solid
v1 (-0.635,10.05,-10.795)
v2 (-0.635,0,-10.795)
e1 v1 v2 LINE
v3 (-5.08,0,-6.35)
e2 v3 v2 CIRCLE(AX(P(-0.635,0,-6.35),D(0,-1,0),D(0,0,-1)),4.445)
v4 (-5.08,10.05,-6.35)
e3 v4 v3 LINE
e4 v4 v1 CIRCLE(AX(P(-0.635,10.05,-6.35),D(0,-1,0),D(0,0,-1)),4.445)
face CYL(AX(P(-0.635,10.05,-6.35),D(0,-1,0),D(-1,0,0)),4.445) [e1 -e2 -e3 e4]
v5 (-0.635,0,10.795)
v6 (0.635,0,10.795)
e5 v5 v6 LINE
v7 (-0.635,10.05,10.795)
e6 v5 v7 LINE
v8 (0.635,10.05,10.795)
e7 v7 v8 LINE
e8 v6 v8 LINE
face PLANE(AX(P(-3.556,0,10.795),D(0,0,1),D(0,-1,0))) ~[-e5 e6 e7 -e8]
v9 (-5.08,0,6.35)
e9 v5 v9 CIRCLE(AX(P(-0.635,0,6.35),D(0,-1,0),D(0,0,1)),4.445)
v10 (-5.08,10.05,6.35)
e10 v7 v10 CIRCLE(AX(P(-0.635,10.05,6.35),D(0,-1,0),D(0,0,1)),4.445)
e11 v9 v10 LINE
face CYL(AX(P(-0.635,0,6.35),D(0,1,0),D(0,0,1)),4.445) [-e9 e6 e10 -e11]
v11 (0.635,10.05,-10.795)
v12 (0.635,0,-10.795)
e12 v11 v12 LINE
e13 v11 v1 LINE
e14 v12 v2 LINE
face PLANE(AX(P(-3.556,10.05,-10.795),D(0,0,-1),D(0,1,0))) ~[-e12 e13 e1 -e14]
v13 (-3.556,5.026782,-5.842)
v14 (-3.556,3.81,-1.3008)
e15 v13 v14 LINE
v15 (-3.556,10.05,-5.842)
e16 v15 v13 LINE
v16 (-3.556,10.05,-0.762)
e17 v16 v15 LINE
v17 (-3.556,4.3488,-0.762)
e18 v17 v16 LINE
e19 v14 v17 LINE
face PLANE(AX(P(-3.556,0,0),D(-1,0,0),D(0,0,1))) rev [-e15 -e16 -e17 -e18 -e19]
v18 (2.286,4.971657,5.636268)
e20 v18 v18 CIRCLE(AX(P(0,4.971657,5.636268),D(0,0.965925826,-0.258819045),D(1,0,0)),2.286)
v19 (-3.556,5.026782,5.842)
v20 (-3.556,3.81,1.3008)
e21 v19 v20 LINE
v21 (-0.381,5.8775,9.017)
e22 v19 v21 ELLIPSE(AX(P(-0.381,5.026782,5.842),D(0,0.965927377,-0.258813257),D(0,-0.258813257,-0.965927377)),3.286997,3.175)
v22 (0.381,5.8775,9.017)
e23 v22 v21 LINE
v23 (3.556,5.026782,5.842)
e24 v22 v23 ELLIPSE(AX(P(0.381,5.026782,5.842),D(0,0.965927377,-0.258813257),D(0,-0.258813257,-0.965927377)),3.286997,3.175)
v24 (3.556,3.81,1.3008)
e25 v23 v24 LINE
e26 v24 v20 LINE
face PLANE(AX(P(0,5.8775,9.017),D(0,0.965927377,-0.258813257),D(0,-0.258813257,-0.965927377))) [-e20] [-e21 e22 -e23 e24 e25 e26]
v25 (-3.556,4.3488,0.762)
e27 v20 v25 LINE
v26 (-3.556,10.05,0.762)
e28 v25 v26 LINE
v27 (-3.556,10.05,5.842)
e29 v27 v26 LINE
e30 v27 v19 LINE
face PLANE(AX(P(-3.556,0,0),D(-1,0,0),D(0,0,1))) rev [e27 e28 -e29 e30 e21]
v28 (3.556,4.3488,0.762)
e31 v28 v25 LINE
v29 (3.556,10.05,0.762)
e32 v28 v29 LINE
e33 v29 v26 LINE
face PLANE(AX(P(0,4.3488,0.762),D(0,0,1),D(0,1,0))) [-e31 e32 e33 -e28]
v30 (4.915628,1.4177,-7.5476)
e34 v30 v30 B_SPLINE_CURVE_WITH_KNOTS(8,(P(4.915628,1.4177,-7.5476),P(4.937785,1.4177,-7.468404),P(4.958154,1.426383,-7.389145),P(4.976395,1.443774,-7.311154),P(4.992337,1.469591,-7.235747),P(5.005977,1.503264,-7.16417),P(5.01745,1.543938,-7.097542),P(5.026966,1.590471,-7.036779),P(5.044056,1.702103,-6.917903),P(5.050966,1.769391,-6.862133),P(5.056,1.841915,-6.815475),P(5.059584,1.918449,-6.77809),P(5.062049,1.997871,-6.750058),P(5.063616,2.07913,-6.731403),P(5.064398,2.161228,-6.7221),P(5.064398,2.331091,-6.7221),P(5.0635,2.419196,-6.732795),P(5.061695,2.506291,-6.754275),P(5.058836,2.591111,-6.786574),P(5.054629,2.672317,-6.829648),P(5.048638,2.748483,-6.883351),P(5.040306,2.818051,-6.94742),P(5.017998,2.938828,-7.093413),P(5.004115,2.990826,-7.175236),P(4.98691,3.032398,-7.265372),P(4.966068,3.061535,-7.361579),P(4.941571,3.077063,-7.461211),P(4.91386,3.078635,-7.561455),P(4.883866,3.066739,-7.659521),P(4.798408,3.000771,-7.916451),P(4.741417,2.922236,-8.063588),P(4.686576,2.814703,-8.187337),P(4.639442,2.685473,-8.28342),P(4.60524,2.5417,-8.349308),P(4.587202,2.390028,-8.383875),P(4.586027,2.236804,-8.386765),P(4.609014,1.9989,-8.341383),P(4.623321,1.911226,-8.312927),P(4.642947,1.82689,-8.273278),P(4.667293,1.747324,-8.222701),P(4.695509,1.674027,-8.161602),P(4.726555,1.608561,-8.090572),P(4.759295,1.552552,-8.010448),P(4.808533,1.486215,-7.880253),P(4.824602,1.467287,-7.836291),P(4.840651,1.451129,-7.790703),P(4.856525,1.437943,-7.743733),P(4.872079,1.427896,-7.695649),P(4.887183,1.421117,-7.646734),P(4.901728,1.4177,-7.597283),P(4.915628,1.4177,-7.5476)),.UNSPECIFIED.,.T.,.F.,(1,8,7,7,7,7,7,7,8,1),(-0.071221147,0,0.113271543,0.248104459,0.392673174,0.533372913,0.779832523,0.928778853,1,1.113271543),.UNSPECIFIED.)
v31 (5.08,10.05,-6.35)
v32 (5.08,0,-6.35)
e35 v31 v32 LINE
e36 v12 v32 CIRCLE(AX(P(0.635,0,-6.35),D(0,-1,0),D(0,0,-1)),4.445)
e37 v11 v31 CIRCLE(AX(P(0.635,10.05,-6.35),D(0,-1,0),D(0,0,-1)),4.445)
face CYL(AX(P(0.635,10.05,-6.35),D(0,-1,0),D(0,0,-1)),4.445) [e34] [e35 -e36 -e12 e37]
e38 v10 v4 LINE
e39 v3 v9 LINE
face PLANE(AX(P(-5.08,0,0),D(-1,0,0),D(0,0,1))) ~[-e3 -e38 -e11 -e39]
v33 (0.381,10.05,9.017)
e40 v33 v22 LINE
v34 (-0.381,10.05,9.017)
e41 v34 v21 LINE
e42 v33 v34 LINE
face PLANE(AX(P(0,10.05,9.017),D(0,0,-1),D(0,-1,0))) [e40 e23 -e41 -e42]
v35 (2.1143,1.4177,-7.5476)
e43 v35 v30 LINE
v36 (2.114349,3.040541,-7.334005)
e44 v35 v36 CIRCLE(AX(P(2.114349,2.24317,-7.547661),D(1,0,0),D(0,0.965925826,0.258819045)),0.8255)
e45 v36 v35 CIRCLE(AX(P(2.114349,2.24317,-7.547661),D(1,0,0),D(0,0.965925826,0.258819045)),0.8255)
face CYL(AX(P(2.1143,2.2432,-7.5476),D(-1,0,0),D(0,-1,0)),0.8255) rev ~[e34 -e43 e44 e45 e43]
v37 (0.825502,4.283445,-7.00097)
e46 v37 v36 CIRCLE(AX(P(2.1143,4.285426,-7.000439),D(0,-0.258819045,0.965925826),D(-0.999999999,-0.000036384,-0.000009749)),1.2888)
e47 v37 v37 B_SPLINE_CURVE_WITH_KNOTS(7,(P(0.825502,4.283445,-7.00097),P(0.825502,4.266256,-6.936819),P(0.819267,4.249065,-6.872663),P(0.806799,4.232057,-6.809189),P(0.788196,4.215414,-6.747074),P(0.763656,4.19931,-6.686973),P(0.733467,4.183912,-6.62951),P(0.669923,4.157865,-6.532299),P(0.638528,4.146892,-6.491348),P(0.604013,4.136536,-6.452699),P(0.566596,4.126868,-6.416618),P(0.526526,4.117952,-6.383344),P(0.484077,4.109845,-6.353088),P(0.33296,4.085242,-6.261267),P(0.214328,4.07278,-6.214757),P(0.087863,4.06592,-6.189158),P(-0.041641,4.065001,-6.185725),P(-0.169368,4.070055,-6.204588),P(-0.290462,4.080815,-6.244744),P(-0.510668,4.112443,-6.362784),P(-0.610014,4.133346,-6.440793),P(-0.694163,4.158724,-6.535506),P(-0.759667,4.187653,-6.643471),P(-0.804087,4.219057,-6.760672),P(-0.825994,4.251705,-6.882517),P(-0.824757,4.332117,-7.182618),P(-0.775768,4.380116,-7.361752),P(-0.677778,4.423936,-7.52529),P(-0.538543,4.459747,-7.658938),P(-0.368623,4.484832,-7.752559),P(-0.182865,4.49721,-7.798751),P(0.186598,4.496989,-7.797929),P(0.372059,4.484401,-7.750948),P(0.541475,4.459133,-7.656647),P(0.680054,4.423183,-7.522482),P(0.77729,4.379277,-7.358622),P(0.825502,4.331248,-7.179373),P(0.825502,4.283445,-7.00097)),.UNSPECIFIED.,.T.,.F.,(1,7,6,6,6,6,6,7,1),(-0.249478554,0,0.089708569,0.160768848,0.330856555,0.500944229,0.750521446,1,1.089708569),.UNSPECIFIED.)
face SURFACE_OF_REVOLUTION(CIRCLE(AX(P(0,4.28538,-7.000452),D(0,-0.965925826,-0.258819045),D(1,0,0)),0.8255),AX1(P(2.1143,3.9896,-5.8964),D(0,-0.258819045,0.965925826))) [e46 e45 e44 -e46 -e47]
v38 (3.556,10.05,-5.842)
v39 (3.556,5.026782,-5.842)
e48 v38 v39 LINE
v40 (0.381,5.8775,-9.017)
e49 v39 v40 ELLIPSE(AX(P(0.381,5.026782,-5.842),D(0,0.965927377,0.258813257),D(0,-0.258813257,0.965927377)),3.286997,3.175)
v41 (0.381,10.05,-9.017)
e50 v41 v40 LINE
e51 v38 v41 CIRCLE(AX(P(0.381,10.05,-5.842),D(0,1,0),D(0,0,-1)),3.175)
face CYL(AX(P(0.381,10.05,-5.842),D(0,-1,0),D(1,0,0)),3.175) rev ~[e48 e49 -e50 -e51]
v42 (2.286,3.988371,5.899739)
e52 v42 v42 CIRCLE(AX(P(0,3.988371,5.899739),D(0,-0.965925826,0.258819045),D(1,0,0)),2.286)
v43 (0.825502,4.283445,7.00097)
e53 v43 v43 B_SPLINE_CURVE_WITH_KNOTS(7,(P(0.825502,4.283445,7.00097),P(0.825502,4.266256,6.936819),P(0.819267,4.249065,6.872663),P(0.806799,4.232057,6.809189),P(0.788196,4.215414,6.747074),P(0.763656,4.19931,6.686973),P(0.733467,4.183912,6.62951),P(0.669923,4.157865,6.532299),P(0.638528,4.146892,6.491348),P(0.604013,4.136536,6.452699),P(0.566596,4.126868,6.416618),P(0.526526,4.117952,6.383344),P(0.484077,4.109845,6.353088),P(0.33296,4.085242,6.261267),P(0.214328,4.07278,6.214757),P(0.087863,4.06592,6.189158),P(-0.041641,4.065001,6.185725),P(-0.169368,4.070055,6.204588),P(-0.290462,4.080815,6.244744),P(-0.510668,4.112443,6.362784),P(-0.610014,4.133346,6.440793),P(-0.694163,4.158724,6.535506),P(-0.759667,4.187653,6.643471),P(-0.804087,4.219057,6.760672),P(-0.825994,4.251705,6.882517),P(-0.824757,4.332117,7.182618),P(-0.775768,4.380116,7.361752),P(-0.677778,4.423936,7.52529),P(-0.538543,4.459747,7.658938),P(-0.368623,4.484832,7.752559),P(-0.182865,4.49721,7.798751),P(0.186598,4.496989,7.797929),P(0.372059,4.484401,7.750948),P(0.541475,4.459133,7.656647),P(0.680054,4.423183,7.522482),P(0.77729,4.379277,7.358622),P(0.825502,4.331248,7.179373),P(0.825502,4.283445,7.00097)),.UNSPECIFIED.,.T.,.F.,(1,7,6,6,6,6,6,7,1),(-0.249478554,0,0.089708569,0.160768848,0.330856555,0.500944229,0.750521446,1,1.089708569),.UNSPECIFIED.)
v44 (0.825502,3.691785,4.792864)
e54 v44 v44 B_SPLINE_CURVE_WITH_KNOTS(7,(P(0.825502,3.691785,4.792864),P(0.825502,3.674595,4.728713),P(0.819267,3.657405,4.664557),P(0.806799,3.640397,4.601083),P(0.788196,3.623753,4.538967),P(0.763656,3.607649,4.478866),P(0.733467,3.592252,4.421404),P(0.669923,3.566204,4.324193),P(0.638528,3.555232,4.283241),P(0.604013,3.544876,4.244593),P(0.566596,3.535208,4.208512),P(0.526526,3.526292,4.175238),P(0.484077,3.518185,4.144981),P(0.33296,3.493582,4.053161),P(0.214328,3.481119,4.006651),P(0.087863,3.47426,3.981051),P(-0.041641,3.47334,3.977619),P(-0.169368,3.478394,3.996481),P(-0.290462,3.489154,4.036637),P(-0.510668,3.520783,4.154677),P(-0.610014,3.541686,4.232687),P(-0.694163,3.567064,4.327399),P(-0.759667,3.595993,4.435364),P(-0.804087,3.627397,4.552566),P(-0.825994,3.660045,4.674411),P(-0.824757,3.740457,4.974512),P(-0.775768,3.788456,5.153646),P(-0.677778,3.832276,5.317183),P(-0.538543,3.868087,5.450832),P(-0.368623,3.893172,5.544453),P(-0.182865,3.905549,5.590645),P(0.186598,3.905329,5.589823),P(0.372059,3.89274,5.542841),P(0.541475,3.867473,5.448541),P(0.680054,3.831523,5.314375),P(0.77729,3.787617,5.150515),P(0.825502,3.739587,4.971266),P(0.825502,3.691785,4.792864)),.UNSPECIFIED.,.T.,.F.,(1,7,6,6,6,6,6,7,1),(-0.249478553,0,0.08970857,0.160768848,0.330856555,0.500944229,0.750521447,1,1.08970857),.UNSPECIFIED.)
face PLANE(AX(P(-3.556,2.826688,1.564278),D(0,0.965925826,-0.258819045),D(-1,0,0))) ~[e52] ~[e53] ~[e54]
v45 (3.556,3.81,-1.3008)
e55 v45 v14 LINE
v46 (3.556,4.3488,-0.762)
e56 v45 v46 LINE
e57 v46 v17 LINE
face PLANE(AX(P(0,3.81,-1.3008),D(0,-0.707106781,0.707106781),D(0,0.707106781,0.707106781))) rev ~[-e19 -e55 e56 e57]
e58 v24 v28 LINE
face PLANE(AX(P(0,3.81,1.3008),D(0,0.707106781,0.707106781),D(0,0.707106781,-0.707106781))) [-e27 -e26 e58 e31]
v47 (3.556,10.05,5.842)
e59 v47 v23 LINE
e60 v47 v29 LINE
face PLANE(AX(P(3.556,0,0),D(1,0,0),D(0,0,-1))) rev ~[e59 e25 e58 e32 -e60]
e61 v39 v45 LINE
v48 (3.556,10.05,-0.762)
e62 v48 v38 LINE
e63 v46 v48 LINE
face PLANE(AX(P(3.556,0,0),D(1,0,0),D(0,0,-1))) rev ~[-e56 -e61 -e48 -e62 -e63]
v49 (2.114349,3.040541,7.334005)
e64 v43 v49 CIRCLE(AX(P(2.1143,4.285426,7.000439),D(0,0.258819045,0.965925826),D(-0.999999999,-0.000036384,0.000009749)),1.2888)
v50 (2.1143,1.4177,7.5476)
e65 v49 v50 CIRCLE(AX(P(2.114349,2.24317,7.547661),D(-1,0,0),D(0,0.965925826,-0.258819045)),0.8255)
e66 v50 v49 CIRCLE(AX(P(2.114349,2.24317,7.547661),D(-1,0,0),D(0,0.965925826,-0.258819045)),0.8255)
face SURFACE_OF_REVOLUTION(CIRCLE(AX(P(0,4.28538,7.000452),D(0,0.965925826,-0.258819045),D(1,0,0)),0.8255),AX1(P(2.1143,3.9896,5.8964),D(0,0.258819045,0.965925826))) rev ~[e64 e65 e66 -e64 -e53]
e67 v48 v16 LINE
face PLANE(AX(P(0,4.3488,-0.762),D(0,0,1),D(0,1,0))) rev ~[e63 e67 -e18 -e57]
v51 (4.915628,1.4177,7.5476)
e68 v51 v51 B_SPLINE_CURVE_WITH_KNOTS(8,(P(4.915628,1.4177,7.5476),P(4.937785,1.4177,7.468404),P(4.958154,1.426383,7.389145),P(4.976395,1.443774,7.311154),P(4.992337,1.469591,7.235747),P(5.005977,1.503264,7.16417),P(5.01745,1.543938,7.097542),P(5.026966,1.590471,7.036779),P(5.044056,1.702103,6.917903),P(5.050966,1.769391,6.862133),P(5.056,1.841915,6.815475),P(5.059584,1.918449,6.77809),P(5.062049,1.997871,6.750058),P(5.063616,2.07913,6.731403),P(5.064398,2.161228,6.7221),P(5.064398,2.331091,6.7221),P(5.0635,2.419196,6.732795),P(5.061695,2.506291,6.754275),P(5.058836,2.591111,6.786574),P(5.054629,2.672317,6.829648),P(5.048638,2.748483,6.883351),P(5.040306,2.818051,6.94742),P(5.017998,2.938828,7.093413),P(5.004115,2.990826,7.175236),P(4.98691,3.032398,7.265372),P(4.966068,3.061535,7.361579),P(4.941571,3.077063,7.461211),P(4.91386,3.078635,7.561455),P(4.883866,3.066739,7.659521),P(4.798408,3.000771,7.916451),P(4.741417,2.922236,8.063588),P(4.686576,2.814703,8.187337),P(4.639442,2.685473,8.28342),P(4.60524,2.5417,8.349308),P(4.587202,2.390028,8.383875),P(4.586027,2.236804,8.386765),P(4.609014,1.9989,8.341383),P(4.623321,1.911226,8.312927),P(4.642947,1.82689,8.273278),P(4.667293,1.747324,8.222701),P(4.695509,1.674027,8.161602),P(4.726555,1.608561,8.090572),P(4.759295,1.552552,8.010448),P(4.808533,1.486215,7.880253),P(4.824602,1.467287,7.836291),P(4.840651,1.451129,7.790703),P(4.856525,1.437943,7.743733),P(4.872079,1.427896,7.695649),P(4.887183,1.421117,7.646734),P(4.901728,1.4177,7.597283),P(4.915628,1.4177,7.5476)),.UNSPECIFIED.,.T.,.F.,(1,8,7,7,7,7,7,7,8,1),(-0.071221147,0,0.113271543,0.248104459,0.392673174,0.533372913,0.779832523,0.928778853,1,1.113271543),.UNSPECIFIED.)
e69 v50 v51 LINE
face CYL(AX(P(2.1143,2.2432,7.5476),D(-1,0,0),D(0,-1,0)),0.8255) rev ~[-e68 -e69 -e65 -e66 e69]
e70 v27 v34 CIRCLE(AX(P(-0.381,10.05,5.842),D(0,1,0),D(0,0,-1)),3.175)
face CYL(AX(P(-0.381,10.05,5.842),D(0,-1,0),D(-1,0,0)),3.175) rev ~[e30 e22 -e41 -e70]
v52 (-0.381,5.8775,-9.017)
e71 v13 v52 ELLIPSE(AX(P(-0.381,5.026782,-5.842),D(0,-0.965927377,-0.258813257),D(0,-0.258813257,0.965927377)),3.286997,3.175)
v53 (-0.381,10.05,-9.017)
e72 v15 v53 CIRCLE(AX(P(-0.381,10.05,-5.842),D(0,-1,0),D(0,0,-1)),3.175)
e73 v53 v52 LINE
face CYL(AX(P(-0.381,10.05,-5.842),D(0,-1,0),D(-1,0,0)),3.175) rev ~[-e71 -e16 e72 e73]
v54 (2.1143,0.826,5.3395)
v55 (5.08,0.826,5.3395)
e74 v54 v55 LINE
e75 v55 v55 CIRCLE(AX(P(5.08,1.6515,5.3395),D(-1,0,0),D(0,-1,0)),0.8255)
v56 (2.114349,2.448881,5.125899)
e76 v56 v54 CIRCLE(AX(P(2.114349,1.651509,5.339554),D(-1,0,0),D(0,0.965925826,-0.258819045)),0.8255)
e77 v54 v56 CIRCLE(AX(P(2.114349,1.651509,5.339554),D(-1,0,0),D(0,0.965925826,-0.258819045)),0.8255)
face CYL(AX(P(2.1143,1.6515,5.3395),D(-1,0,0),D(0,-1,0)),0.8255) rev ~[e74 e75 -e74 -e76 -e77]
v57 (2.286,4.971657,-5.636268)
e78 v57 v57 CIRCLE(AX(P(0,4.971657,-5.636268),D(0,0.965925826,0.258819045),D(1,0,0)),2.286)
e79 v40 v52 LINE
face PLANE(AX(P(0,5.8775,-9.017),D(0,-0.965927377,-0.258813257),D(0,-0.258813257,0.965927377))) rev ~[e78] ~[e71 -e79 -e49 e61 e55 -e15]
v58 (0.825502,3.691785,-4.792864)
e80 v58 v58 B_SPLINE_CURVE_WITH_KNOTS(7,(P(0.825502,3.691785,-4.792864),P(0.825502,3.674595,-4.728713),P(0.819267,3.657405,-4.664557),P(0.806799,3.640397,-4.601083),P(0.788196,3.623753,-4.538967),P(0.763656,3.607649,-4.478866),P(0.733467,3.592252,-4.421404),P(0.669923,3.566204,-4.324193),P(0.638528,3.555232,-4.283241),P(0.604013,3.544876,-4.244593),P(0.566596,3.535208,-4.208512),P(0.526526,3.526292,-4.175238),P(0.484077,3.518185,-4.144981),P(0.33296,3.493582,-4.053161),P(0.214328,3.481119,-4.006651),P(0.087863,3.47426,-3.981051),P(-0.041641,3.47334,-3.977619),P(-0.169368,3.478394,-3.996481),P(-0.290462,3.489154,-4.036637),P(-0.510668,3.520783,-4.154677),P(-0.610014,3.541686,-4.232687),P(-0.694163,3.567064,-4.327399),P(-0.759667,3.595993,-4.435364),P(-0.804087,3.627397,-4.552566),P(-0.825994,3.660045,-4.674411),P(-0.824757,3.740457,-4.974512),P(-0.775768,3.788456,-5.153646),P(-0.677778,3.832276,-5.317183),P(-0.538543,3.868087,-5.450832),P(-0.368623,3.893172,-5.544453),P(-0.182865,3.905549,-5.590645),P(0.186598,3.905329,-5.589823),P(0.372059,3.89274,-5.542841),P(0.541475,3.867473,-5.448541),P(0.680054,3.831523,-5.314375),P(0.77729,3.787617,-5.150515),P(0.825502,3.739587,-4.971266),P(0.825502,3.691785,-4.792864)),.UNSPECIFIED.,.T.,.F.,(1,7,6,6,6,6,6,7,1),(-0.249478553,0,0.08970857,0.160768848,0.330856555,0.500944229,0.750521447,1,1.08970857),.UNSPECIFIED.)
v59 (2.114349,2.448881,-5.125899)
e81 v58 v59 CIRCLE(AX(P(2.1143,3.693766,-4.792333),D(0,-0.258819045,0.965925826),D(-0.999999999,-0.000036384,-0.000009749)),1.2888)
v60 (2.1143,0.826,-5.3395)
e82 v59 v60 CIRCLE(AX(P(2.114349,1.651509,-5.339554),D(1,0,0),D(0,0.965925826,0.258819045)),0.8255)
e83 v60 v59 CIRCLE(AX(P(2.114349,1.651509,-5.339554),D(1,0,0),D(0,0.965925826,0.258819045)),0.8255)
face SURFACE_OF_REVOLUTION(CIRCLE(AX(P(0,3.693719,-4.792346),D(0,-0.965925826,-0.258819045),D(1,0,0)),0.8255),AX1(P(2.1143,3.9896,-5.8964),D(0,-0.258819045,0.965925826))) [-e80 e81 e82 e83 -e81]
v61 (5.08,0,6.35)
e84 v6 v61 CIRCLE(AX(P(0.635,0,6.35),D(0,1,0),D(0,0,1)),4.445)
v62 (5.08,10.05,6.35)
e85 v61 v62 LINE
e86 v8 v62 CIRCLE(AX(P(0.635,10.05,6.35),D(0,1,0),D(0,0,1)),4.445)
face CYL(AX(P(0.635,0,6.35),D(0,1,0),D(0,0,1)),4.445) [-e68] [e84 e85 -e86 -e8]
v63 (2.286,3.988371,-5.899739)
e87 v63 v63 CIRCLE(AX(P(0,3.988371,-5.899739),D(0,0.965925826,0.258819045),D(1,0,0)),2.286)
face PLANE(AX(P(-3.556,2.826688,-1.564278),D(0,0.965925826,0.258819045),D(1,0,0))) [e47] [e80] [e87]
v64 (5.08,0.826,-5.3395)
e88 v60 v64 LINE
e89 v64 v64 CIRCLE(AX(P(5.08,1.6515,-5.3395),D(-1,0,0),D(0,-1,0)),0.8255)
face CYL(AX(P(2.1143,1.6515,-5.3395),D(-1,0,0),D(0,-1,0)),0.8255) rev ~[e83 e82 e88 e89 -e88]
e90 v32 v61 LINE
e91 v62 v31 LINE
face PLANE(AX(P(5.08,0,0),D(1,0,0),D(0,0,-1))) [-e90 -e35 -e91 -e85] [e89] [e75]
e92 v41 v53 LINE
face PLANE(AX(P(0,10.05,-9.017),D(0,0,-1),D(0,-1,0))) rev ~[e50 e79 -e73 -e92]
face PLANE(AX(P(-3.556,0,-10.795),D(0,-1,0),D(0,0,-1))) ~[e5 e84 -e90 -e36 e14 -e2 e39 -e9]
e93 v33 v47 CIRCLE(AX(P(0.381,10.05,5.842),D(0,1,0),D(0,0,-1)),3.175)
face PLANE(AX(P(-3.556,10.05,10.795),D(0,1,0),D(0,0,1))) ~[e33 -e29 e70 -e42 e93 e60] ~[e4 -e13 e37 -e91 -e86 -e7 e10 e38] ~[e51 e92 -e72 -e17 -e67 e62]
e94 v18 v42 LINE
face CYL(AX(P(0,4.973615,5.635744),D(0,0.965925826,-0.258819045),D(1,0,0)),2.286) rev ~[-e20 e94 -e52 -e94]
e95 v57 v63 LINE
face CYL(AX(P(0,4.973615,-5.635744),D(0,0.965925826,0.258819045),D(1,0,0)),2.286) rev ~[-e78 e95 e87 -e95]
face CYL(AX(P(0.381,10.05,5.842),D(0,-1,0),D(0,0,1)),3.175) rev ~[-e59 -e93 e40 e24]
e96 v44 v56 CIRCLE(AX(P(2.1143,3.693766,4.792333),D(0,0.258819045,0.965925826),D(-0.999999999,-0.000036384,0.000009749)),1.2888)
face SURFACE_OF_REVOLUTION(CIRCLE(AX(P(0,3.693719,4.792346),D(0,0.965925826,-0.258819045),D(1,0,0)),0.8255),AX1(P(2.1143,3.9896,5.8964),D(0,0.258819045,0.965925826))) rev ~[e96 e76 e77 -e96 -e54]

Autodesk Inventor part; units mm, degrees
ref_plane "YZ Plane" through (0, 0, 0) normal (1, 0, 0) x (0, 1, 0)
ref_plane "XZ Plane" through (0, 0, 0) normal (0, 1, 0) x (-1, 0, 0)
sketch "Sketch1" plane through (0, 0, 0) normal (1, 0, 0) x (0, 1, 0)
  line L0 (0, 0) -> (0, 10.795)
  line L1 (0, 10.795) -> (10.05, 10.795)
  line L2 (10.05, 10.795) -> (10.05, 9.017)
  line L3 (10.05, 9.017) -> (5.8775, 9.017)
  line L4 (5.8775, 9.017) -> (3.81, 1.3008)
  line L5 (4.3488, 0.762) -> (10.05, 0.762)
  line L6 (10.05, 0.762) -> (10.05, 0)
  line L7 (0, 0) -> (10.05, 0) construction
  line L8 (3.81, 1.3008) -> (4.3488, 0.762)
  line L9 (0, 0) -> (0, -10.795)
  line L10 (0, -10.795) -> (10.05, -10.795)
  line L11 (10.05, -10.795) -> (10.05, -9.017)
  line L12 (10.05, -9.017) -> (5.8775, -9.017)
  line L13 (5.8775, -9.017) -> (3.81, -1.3008)
  line L14 (4.3488, -0.762) -> (10.05, -0.762)
  line L15 (10.05, -0.762) -> (10.05, 0)
  line L16 (3.81, -1.3008) -> (4.3488, -0.762)
  dimension "d0" = 10.795
  dimension "d1" = 105
  dimension "d8" = 0.762
  dimension "d33" = 3.81
  dimension "d34" = 10.05
  dimension "d35" = 0.762
  dimension "d36" = 1.778
extrude "Extrusion1" add sketch "Sketch1" along normal mid plane 7.112
sketch "Sketch2" plane through (3.556, 0, 0) normal (1, 0, 0) x (0, 0, -1)
  line L0 (-10.795, 10.05) -> (10.795, 10.05)
  line L1 (10.795, 10.05) -> (10.795, 0)
  line L2 (10.795, 0) -> (-10.795, 0)
  line L3 (-10.795, 0) -> (-10.795, 10.05)
  point P0 (0, 0)
extrude "Extrusion2" add sketch "Sketch2" along normal blind 1.524
ref_plane "Work Plane1" through (0, 0, 0) normal (-1, 0, 0) x (0, 0, 1)
mirror "Mirror1" about plane through (0, 0, 0) normal (-1, 0, 0) of "Extrusion2"
ref_plane "Work Plane2" through (3.556, 5.8775, 0) normal (0, 0, 1) x (1, 0, 0)
sketch "Sketch3" plane through (-3.556, 3.81, -1.3008) normal (0, 0.9659258, 0.258819) x (1, 0, 0)
  circle A0 centre (3.556, 4.4884) radius 2.286
  line L0 (3.556, -2.2426) -> (3.556, 4.4884) construction
  line L1 (7.112, 1.0946) -> (0, 1.0946) construction
  dimension "d14" = 4.572
  dimension "d15" = 6.731
extrude "Extrusion3" cut sketch "Sketch3" against normal blind 1.016
mirror "Mirror2" about plane through (3.556, 5.8775, 0) normal (0, 0, 1) of "Extrusion3"
fillet "Fillet4" radius 3.175 4 edges at (3.556, 7.9638, -9.017) (-3.556, 7.9638, -9.017) (3.556, 7.9638, 9.017) (-3.556, 7.9638, 9.017)
fillet "Fillet5" radius 4.445 4 edges at (5.08, 5.025, 10.795) (5.08, 5.025, -10.795) (-5.08, 5.025, -10.795) (-5.08, 5.025, 10.795)
sketch "Sketch4" plane through (0, 3.9903, 5.8992) normal (0, 0.9659258, -0.258819) x (1, 0, 0)
  line L0 (0, 0.0029) -> (0, -1.1401) construction
  line L1 (0, 0.0029) -> (0, 1.1459) construction
  line L2 (0, 0.0029) -> (0, -1.1079) construction
  circle A0 centre (0, 1.1459) radius 0.8255
  circle A1 centre (0, -1.1401) radius 0.8255
  line L3 (2.1143, 0.0029) -> (2.1143, 2.2658) construction
  point P0 (0, 6.731)
  dimension "d43" = 1.143
  dimension "d44" = 1.651
revolve "Revolution1" cut sketch "Sketch4" angle 90 about axis through (2.1143, 3.9896, 5.8964) along (0, 0.258819, 0.9659258)
mirror "Mirror3" about plane through (3.556, 5.8775, 0) normal (0, 0, 1) of "Revolution1"
sketch "Sketch6" plane through (2.1143, 4.7773, -7.6581) normal (-1, 0, 0) x (0, -1, 0)
  circle A0 centre (2.5341, 0.1105) radius 0.8255 projected
  circle A1 centre (2.5341, 0.1105) radius 0.8255
  circle A2 centre (3.1258, 2.3186) radius 0.8255 projected
  circle A3 centre (3.1258, 2.3186) radius 0.8255
  point P0 (4.7773, 7.6581)
extrude "Extrusion6" cut sketch "Sketch6" against normal up to next
mirror "Mirror10" about plane through (3.556, 5.8775, 0) normal (0, 0, 1) of "Extrusion6"
equation "\"d0\" = 0.5 * Base_Length"
equation "\"d1\" = Sensor_Angle"
equation "\"d33\" = Base_Thickness"
equation "\"d34\" = Mount_Height"
equation "\"d14\" = LED_Base"
equation "\"d15\" = Hole_to_Center"
equation "\"d18\" = Wire_Spacing"
equation "\"Wire_Spacing\" = 1.143"
equation "\"Wire_Diameter\" = 1.651"
equation "\"LED_Base\" = 4.572"
equation "\"Mount_Space\" = 22.75"
equation "\"Mount_Clearance\" = 6.35"
equation "\"Mount_Height\" = 10.05"
equation "\"Base_Length\" = 21.59"
equation "\"Base_Width\" = 10.16"
equation "\"Sensor_Angle\" = 105deg"
equation "\"Base_Thickness\" = 3.81"
equation "\"Hole_to_Center\" = 6.731"
equation "\"Tape_Width\" = 6.35"
properties part number "Line Tracker v4" material "PLA Plastic"
